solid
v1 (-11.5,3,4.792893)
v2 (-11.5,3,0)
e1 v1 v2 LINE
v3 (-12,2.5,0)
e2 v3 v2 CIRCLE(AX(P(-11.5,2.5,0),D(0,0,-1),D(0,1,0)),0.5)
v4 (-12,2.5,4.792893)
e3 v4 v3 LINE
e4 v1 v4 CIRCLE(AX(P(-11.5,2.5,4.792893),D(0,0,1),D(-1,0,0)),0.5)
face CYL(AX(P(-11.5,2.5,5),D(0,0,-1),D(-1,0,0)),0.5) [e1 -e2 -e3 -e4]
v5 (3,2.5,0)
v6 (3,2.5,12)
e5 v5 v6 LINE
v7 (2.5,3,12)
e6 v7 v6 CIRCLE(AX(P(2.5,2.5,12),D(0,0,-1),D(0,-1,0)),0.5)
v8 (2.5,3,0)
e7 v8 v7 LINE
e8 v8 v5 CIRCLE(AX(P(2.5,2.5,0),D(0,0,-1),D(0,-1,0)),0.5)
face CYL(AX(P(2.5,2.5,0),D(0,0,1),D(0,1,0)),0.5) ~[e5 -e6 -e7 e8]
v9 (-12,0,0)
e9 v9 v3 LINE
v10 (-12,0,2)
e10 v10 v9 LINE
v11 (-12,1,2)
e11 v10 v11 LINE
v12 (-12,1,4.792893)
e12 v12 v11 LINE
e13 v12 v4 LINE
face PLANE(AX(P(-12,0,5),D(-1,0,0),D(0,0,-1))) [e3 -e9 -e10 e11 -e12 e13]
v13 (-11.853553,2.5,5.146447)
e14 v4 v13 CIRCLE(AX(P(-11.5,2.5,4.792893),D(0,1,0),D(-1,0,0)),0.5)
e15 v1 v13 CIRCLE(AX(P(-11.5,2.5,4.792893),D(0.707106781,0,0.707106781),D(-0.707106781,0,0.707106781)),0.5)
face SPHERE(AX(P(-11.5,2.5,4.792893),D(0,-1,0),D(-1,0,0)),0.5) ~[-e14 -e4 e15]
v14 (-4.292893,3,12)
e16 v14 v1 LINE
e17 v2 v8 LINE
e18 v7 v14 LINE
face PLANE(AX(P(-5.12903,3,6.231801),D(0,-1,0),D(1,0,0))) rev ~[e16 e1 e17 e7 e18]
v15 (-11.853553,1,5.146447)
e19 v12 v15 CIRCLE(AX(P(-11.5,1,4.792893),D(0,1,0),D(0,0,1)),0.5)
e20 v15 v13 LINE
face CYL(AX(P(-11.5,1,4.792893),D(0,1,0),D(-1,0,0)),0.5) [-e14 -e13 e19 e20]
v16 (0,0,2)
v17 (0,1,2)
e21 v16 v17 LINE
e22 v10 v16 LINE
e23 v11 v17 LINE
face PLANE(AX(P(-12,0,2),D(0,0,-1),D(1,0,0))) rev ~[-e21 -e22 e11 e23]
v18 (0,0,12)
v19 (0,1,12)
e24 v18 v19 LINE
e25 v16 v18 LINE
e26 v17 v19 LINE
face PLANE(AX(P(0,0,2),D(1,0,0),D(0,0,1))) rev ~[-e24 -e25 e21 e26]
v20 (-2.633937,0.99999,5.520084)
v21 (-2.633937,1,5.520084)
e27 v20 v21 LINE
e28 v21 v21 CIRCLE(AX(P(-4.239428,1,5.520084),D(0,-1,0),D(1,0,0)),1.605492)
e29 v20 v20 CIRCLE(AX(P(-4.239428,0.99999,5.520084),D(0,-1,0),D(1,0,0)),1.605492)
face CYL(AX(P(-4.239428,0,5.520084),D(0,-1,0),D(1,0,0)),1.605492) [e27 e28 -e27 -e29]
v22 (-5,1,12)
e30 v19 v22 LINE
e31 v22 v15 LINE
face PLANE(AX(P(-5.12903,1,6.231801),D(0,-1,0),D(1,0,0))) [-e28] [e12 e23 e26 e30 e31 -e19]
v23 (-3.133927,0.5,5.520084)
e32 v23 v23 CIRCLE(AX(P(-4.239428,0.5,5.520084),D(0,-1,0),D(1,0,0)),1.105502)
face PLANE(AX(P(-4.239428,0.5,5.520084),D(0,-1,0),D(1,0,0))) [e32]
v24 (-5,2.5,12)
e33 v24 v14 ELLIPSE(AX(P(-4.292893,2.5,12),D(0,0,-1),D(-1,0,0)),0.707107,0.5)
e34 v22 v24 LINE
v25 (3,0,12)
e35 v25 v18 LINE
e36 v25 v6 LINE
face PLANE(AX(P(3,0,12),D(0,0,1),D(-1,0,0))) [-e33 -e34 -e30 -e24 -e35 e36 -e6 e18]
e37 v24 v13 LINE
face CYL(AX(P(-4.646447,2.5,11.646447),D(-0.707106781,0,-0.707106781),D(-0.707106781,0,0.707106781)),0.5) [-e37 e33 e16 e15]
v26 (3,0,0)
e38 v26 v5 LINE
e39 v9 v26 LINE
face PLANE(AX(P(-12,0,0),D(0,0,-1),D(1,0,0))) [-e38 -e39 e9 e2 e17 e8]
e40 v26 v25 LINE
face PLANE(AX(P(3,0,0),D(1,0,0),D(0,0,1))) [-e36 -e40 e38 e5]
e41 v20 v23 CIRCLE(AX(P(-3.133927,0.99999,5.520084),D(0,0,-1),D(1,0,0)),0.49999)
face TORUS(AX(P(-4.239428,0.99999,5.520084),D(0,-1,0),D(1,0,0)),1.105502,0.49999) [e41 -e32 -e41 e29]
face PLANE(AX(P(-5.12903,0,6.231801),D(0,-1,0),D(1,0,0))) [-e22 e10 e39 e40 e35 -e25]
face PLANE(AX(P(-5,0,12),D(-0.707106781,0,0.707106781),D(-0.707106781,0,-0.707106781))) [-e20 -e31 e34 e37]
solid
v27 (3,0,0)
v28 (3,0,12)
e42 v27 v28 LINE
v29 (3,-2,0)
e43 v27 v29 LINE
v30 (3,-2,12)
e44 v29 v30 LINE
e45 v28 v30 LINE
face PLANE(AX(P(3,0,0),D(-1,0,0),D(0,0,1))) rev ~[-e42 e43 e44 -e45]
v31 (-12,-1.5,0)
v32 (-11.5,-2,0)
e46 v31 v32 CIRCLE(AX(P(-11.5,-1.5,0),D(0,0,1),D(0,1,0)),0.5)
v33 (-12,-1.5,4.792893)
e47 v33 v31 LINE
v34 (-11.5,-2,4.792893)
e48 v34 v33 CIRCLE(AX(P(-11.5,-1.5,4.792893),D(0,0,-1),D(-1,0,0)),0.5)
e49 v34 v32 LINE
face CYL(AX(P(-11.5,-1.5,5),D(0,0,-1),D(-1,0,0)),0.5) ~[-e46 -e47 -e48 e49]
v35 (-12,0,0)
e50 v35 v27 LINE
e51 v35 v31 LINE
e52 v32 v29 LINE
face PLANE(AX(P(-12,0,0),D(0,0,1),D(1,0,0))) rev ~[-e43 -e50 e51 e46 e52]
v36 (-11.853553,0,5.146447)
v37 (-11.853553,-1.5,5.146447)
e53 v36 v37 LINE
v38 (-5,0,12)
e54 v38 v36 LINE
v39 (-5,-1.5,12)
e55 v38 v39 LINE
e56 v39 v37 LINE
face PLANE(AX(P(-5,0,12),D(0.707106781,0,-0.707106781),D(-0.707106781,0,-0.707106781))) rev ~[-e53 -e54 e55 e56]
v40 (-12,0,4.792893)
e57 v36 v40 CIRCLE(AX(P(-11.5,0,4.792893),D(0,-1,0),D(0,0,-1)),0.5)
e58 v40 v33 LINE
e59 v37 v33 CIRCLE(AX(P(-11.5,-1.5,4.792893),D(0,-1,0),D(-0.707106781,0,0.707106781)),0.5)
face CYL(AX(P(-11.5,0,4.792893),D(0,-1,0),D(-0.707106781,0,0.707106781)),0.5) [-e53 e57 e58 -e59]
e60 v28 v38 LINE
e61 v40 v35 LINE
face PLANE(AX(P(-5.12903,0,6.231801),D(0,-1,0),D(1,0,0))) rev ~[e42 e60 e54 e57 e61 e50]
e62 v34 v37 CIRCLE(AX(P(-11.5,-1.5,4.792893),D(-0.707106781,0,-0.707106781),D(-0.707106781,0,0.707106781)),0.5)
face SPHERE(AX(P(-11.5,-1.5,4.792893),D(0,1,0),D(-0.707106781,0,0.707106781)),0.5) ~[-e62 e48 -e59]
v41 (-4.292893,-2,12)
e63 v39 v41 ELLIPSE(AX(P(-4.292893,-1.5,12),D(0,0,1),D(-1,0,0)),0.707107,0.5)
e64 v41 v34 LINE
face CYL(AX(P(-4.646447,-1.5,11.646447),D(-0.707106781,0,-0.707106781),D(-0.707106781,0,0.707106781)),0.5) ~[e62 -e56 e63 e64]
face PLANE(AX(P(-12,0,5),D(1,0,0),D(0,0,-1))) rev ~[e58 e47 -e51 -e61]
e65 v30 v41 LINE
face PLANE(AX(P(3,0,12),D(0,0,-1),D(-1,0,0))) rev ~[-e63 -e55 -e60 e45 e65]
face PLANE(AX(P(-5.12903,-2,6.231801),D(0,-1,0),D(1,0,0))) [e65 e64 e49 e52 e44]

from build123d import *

# Parameters (mm, degrees)
F0_R     = 1.6054916764
F1_DEPTH = 3
F2_DEPTH = 1
F3_DEPTH = 0.5
F4_R     = 0.49999
F5_DEPTH = 2
F6_R     = 0.5
F7_R     = 0.5


# Not quite as in the source:
# - a fillet or chamfer is up to 0.001 mm smaller than in the source, because OpenCascade refuses the exact size


with BuildPart() as f1:
    # F0 (on Front) → F1 (new body)
    with BuildSketch(Plane.XZ):
        Polygon((0, 2), (0, 12), (-5, 12), (-12, 5), (-12, 2), align=None)
        with Locations((-4.2394283228, 5.5200844072)):
            Circle(F0_R, mode=Mode.SUBTRACT)
        with Locations((-4.2394283228, 5.5200844072)):
            Circle(F0_R)
        Polygon((3, 12), (0, 12), (0, 2), (-12, 2), (-12, 0), (0, 0), (3, 0), align=None)
    extrude(amount=-F1_DEPTH)

    # F0 (on Front) → F2 (cut)
    with BuildSketch(Plane.XZ):
        Polygon((0, 2), (0, 12), (-5, 12), (-12, 5), (-12, 2), align=None)
        with Locations((-4.2394283228, 5.5200844072)):
            Circle(F0_R, mode=Mode.SUBTRACT)
    extrude(amount=-F2_DEPTH, mode=Mode.SUBTRACT)

    # F0 (on Front) → F3 (cut)
    with BuildSketch(Plane.XZ):
        with Locations((-4.2394283228, 5.5200844072)):
            Circle(F0_R)
    extrude(amount=-F3_DEPTH, mode=Mode.SUBTRACT)

    # F4 (radius 0.5 in the source; OpenCascade refuses exactly that, so slightly less here)
    f4_edges = [f1.edges().sort_by_distance(p)[0] for p in [
        (-5.84492, 0.5, 5.520084),
    ]]
    fillet(f4_edges, radius=F4_R)

    # F7
    f7_edges = [f1.edges().sort_by_distance(p)[0] for p in [
        (-8.5, 3, 8.5),
        (-12, 2, 5),
        (-12, 3, 2.5),
        (3, 3, 6),
    ]]
    fillet(f7_edges, radius=F7_R)


with BuildPart() as f5:
    # F0 (on Front) → F5 (new body)
    with BuildSketch(Plane.XZ):
        Polygon((0, 2), (0, 12), (-5, 12), (-12, 5), (-12, 2), align=None)
        with Locations((-4.2394283228, 5.5200844072)):
            Circle(F0_R, mode=Mode.SUBTRACT)
        Polygon((3, 12), (0, 12), (0, 2), (-12, 2), (-12, 0), (0, 0), (3, 0), align=None)
        with Locations((-4.2394283228, 5.5200844072)):
            Circle(F0_R)
    extrude(amount=F5_DEPTH)

    # F6
    f6_edges = [f5.edges().sort_by_distance(p)[0] for p in [
        (-8.5, -2, 8.5),
        (-12, -2, 2.5),
        (-12, -1, 5),
    ]]
    fillet(f6_edges, radius=F6_R)


solid = Compound([f1.part, f5.part])
